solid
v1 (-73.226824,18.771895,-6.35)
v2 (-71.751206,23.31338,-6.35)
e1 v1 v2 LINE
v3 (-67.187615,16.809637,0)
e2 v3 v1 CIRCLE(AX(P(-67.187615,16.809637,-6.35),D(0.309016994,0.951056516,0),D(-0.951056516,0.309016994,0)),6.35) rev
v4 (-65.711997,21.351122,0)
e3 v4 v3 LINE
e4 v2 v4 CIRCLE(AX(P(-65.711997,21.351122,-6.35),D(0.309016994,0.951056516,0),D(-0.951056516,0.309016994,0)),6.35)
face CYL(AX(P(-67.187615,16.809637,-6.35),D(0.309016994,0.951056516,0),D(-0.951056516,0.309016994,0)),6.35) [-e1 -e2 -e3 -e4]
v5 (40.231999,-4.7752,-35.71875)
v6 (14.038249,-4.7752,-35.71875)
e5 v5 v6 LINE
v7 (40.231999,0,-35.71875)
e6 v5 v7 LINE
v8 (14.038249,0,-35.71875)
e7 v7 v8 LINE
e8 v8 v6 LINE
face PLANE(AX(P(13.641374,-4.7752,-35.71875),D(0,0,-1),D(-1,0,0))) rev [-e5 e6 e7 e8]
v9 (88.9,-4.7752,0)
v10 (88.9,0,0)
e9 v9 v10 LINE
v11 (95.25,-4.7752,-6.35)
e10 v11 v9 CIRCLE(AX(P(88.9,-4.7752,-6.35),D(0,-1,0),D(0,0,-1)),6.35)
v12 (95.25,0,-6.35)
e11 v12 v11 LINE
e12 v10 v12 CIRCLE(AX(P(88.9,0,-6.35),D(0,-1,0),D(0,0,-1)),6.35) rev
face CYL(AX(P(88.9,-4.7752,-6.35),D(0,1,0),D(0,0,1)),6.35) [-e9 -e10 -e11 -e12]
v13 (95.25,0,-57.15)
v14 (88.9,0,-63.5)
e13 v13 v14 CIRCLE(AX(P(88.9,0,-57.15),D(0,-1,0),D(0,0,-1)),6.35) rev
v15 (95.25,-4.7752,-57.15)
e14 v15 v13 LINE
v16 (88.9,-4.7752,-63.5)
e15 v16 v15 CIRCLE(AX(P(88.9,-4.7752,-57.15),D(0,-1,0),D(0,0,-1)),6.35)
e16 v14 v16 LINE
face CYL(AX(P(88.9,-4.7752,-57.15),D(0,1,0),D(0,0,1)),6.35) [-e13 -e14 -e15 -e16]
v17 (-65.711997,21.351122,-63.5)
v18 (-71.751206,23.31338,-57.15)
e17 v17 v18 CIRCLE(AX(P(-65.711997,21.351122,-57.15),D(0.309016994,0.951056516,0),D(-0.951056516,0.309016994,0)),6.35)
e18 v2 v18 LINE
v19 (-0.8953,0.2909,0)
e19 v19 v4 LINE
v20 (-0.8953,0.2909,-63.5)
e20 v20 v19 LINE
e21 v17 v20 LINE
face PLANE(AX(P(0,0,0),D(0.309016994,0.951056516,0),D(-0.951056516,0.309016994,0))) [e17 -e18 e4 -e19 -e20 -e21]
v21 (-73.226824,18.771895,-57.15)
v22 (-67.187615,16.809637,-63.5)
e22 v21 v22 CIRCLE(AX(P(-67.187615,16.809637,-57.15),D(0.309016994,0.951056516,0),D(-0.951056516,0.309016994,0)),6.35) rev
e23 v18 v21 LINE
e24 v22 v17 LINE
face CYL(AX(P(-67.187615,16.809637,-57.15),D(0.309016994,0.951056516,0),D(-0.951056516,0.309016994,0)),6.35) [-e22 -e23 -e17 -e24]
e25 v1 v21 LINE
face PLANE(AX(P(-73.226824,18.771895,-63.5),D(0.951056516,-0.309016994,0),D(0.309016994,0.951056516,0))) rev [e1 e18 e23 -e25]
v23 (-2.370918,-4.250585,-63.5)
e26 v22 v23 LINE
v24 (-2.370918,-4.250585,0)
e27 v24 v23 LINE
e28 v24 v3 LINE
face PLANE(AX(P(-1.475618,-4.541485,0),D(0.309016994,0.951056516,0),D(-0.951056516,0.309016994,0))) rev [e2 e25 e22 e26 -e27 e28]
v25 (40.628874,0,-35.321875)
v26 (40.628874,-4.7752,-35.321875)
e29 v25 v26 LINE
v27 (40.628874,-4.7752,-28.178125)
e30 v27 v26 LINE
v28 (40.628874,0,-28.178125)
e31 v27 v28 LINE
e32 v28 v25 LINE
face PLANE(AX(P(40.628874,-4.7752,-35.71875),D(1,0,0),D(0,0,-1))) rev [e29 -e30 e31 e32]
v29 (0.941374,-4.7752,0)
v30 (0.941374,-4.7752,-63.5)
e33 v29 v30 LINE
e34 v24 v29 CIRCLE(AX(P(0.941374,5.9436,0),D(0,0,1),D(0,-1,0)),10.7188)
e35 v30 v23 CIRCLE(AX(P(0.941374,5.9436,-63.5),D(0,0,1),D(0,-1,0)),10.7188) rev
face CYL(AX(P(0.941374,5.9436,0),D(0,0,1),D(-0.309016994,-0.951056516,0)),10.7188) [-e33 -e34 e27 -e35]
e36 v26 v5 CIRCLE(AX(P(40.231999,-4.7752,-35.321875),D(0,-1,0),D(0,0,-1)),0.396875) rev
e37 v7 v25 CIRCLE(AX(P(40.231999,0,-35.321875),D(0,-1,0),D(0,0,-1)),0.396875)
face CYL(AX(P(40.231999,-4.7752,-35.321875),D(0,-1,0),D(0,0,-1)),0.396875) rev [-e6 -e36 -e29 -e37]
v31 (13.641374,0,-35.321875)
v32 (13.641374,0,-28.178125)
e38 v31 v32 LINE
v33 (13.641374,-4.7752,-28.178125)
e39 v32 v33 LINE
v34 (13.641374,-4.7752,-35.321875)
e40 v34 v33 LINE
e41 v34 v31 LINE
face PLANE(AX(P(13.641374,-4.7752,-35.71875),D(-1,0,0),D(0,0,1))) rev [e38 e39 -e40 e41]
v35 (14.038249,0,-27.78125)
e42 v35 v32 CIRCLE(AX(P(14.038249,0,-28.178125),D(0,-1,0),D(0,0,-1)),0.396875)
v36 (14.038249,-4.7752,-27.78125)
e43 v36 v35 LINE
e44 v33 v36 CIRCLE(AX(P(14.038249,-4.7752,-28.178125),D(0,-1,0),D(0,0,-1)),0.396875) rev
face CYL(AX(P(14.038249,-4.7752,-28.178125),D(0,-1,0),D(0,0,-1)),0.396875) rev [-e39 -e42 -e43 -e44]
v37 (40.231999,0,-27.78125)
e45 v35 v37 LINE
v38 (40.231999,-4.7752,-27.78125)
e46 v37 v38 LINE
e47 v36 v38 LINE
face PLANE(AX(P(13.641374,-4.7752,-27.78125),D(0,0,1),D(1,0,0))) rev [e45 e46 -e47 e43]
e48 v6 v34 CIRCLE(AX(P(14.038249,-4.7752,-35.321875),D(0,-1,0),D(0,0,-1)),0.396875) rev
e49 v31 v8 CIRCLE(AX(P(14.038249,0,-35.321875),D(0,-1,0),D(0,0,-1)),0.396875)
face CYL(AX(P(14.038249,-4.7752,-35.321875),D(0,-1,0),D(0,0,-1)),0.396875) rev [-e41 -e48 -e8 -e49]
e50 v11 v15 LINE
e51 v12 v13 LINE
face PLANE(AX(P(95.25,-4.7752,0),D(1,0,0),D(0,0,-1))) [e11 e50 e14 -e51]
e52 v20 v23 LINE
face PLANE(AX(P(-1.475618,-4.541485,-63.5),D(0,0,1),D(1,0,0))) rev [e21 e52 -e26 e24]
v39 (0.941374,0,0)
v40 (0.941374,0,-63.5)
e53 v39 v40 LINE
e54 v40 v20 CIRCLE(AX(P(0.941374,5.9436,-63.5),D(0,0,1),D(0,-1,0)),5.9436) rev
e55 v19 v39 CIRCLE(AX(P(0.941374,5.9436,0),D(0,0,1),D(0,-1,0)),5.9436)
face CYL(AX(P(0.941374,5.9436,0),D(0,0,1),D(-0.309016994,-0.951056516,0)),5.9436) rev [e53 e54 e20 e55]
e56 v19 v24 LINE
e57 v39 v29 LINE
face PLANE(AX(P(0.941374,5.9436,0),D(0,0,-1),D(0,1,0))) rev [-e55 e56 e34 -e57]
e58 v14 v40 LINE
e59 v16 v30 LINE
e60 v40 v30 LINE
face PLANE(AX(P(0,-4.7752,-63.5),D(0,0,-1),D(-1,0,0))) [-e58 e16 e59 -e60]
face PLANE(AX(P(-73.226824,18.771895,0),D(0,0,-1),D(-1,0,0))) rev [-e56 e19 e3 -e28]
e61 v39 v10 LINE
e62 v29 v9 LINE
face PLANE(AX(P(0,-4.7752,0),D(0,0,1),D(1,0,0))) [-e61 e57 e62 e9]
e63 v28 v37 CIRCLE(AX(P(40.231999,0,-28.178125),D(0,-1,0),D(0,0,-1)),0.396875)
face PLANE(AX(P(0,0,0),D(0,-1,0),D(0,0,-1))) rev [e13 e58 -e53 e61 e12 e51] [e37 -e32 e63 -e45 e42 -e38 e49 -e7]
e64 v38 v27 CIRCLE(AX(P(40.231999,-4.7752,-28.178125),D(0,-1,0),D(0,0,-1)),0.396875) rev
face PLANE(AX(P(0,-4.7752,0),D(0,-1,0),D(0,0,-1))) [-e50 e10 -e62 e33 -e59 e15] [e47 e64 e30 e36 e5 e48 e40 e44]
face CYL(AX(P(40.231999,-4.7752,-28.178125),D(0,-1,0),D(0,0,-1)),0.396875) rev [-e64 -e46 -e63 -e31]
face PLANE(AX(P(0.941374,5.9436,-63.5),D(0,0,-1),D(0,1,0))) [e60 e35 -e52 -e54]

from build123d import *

# Parameters (mm, degrees)
SKETCH2_W                    = 95.25
SKETCH2_H                    = 63.5
BASE_FLANGE1_DEPTH           = 4.7752
EDGE_FLANGE1_STRIP_CUT_DEPTH = 63.5
EDGE_FLANGE1_DEPTH           = 63.5
FILLET1_R                    = 6.35
SKETCH10_W                   = 26.9875
SKETCH10_H                   = 7.9375
CUT_EXTRUDE1_DEPTH           = 117.826050987
FILLET2_R                    = 0.396875


# Sheet-metal steps are written as plain solids
with BuildPart() as part:
    # Sketch2 → Base-Flange1 (new body)
    with BuildSketch(Plane(origin=(0, 0, 0), x_dir=(1, 0, 0), z_dir=(0, 1, 0))):
        with Locations((47.625, 31.75)):
            Rectangle(SKETCH2_W, SKETCH2_H)
    extrude(amount=-BASE_FLANGE1_DEPTH)

    # Edge-Flange1 strip (across the edge) → Edge-Flange1 strip cut (cut)
    with BuildSketch(Plane(origin=(0, 0, -63.5), x_dir=(0.3090169943749416, 0.9510565162951554, 0), z_dir=(0, 0, 1))):
        Polygon((-13.826403209, 27.100421727), (-4.250584587, -2.3709176), (0.29090049, -0.895299648), (-9.284918132, 28.576039679), align=None)
    extrude(amount=EDGE_FLANGE1_STRIP_CUT_DEPTH, mode=Mode.SUBTRACT)

    # Edge-Flange1 section (across the edge) → Edge-Flange1 (add)
    with BuildSketch(Plane(origin=(0, 0, -63.5), x_dir=(0.3090169943749416, 0.9510565162951554, 0), z_dir=(0, 0, 1))):
        with BuildLine():
            Line((-4.7752, 0.94137376), (-4.7752, 75.443682621))
            Line((-4.7752, 75.443682621), (0, 75.443682621))
            Line((0, 75.443682621), (0, 0.94137376))
            ThreePointArc((0, 0.94137376), (0.073175579, 0.011589873), (0.29090049, -0.895299648))
            Line((0.29090049, -0.895299648), (-4.250584587, -2.3709176))
            ThreePointArc((-4.250584587, -2.3709176), (-4.643233785, -0.735415984), (-4.7752, 0.94137376))
        make_face()
    extrude(amount=EDGE_FLANGE1_DEPTH)

    # Fillet1
    fillet1_edges = [part.edges().sort_by_distance(p)[0] for p in [
        (-72.489014945, 21.04263751, -63.5),
        (-72.489014945, 21.04263751, 0),
        (95.25, -2.3876, -63.5),
        (95.25, -2.3876, 0),
    ]]
    fillet(fillet1_edges, radius=FILLET1_R)

    # Sketch10 → Cut-Extrude1 (cut, through all)
    with BuildSketch(Plane(origin=(0, 0, 0), x_dir=(1, 0, 0), z_dir=(0, 1, 0))):
        with Locations((27.13512376, 31.75)):
            Rectangle(SKETCH10_W, SKETCH10_H)
    extrude(amount=-CUT_EXTRUDE1_DEPTH, mode=Mode.SUBTRACT)

    # Fillet2
    fillet2_edges = [part.edges().sort_by_distance(p)[0] for p in [
        (13.64137376, -2.3876, -27.78125),
        (13.64137376, -2.3876, -35.71875),
        (40.62887376, -2.3876, -35.71875),
        (40.62887376, -2.3876, -27.78125),
    ]]
    fillet(fillet2_edges, radius=FILLET2_R)


solid = part.part
